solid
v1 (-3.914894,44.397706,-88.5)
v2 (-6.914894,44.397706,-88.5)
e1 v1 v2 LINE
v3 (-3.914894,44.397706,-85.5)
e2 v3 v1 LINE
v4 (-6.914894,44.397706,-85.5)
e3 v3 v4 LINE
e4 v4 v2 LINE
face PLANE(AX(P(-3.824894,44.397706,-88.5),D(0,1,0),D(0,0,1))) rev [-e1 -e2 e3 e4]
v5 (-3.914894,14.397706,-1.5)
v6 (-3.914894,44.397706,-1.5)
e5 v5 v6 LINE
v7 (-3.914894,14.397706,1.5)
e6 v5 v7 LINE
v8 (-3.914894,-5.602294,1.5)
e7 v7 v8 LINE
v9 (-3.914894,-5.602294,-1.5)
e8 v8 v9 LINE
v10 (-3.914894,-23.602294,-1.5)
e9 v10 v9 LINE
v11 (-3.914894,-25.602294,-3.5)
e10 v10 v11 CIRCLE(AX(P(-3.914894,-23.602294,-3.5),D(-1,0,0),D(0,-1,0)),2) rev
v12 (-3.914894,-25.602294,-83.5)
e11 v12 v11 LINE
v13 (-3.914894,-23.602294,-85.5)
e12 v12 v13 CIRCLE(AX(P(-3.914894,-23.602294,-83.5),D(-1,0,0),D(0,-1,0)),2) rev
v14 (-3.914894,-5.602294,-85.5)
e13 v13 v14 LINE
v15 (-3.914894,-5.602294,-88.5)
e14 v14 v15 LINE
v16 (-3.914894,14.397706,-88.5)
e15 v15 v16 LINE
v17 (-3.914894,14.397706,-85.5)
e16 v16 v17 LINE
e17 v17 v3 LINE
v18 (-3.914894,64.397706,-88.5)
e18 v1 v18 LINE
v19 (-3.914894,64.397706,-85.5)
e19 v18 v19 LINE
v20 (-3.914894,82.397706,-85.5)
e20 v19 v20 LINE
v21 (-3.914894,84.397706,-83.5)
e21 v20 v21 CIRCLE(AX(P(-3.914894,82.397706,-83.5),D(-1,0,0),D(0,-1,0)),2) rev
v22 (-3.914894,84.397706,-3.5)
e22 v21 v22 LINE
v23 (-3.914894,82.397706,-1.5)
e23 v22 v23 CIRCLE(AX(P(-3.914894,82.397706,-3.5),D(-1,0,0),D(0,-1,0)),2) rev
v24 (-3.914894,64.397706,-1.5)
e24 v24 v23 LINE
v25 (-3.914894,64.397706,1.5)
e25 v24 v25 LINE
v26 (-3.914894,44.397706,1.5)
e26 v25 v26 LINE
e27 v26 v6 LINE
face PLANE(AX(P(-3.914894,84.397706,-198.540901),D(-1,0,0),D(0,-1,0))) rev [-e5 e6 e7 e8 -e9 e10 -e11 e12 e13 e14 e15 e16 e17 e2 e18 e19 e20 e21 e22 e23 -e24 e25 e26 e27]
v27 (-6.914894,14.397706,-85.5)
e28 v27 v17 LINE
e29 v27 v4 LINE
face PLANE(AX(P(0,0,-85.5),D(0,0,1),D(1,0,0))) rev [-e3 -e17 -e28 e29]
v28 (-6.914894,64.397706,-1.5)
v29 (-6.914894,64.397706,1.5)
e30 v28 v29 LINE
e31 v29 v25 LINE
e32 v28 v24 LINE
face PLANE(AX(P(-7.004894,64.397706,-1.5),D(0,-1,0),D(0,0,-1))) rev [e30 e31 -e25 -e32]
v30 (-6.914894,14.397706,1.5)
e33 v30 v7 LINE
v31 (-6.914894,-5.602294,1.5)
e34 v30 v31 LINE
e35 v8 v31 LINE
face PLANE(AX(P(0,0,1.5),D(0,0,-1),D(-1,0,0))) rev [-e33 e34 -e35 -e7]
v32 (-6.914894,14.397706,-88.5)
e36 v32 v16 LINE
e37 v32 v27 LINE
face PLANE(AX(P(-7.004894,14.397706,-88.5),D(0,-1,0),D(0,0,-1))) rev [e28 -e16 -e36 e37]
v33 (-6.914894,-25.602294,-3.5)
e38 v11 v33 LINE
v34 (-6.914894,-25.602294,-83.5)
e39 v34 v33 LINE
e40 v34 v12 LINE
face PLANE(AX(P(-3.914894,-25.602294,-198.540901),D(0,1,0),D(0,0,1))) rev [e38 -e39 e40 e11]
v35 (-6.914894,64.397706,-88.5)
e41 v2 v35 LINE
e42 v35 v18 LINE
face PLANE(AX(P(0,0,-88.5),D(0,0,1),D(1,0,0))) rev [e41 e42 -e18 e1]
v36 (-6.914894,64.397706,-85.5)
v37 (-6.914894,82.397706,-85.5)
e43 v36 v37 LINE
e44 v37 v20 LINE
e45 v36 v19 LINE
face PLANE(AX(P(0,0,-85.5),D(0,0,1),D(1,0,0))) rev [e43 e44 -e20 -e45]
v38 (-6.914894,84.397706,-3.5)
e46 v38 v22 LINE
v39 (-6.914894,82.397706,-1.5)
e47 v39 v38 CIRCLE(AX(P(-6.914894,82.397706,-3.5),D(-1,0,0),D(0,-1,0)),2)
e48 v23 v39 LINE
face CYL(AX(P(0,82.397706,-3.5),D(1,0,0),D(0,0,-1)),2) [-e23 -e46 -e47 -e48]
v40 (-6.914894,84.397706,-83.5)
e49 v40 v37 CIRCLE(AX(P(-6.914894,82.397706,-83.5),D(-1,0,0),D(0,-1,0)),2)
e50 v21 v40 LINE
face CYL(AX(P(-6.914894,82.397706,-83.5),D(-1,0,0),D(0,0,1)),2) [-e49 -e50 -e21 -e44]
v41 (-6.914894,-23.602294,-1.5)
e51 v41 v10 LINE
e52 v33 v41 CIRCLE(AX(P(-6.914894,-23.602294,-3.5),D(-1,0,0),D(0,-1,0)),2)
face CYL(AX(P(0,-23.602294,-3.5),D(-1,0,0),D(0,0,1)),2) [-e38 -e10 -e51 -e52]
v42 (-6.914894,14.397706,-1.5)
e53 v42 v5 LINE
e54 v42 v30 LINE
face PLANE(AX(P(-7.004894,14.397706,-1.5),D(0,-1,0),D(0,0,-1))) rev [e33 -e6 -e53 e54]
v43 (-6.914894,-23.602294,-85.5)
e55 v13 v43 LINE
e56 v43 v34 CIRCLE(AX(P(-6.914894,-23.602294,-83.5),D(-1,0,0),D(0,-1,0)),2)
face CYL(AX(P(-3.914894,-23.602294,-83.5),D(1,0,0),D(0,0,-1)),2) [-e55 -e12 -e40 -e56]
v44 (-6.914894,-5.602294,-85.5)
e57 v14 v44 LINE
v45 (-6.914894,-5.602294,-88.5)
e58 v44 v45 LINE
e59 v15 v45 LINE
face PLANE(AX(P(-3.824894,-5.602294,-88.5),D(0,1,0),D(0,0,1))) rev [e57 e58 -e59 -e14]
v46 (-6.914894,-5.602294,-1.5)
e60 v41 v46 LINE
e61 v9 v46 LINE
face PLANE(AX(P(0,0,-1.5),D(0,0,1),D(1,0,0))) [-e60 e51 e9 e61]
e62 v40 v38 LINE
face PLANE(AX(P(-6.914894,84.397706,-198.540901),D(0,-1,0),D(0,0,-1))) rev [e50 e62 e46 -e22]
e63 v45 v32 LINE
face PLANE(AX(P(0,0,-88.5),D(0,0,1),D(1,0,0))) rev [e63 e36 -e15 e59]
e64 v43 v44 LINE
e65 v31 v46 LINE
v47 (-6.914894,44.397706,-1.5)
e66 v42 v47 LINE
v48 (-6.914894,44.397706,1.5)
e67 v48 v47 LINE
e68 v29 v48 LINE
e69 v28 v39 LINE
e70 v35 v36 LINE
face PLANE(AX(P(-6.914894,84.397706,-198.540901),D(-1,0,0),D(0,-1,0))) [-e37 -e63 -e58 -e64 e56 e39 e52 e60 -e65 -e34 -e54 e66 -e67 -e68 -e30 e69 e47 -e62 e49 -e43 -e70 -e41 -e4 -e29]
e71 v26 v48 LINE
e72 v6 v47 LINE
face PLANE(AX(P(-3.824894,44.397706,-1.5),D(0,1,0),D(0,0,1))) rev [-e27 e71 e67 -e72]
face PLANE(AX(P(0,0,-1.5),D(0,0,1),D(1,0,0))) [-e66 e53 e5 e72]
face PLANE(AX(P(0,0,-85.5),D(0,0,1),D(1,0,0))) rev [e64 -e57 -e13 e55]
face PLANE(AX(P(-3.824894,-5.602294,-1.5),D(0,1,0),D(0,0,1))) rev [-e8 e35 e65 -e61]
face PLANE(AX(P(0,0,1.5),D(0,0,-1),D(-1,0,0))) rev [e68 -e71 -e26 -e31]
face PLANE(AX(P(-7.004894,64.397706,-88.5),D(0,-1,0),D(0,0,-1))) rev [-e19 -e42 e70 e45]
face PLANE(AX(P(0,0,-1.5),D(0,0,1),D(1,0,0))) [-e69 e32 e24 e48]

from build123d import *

# Parameters (mm, degrees)
SKETCH1_W           = 3
SKETCH1_H           = 110
EXTRUDE_THIN1_DEPTH = 90
CAVITY1_START       = 14.397705985
CAVITY1_OUTLINE_W   = 3
CAVITY1_OUTLINE_H   = 3
CAVITY1_DEPTH       = 30
CAVITY1_START_2     = -25.602294015
CAVITY1_2_OUTLINE_W = 3
CAVITY1_2_OUTLINE_H = 3
CAVITY1_2_DEPTH     = 20
CAVITY1_START_3     = 64.397705985
CAVITY1_3_OUTLINE_W = 3
CAVITY1_3_OUTLINE_H = 3
CAVITY1_3_DEPTH     = 20
FILLET1_R           = 2


# Read off the part's stored shape, not the designer's step: Cavity1
with BuildPart() as part:
    # Sketch1 → Extrude-Thin1 (new body)
    with BuildSketch(Plane.XY.offset(1.5)):
        with Locations((-5.414893617, 29.397705985)):
            Rectangle(SKETCH1_W, SKETCH1_H)
    extrude(amount=-EXTRUDE_THIN1_DEPTH)

    # Cavity1 outline → Cavity1 (cut)
    with BuildSketch(Plane(origin=(0, 0, 0), x_dir=(1, 0, 0), z_dir=(0, 1, 0)).offset(CAVITY1_START)):
        with Locations((-5.414893617, 87)):
            Rectangle(CAVITY1_OUTLINE_W, CAVITY1_OUTLINE_H)
        with Locations((-5.414893617, 0)):
            Rectangle(CAVITY1_OUTLINE_W, CAVITY1_OUTLINE_H)
    extrude(amount=CAVITY1_DEPTH, mode=Mode.SUBTRACT)

    # Cavity1 2 outline → Cavity1 2 (cut)
    with BuildSketch(Plane(origin=(0, 0, 0), x_dir=(1, 0, 0), z_dir=(0, 1, 0)).offset(CAVITY1_START_2)):
        with Locations((-5.414893617, 87)):
            Rectangle(CAVITY1_2_OUTLINE_W, CAVITY1_2_OUTLINE_H)
        with Locations((-5.414893617, 0)):
            Rectangle(CAVITY1_2_OUTLINE_W, CAVITY1_2_OUTLINE_H)
    extrude(amount=CAVITY1_2_DEPTH, mode=Mode.SUBTRACT)

    # Cavity1 3 outline → Cavity1 3 (cut)
    with BuildSketch(Plane(origin=(0, 0, 0), x_dir=(1, 0, 0), z_dir=(0, 1, 0)).offset(CAVITY1_START_3)):
        with Locations((-5.414893617, 87)):
            Rectangle(CAVITY1_3_OUTLINE_W, CAVITY1_3_OUTLINE_H)
        with Locations((-5.414893617, 0)):
            Rectangle(CAVITY1_3_OUTLINE_W, CAVITY1_3_OUTLINE_H)
    extrude(amount=CAVITY1_3_DEPTH, mode=Mode.SUBTRACT)

    # Fillet1
    fillet1_edges = [part.edges().sort_by_distance(p)[0] for p in [
        (-5.414893617, -25.602294015, -85.5),
        (-5.414893617, 84.397705985, -85.5),
        (-5.414893617, -25.602294015, -1.5),
        (-5.414893617, 84.397705985, -1.5),
    ]]
    fillet(fillet1_edges, radius=FILLET1_R)


solid = part.part
